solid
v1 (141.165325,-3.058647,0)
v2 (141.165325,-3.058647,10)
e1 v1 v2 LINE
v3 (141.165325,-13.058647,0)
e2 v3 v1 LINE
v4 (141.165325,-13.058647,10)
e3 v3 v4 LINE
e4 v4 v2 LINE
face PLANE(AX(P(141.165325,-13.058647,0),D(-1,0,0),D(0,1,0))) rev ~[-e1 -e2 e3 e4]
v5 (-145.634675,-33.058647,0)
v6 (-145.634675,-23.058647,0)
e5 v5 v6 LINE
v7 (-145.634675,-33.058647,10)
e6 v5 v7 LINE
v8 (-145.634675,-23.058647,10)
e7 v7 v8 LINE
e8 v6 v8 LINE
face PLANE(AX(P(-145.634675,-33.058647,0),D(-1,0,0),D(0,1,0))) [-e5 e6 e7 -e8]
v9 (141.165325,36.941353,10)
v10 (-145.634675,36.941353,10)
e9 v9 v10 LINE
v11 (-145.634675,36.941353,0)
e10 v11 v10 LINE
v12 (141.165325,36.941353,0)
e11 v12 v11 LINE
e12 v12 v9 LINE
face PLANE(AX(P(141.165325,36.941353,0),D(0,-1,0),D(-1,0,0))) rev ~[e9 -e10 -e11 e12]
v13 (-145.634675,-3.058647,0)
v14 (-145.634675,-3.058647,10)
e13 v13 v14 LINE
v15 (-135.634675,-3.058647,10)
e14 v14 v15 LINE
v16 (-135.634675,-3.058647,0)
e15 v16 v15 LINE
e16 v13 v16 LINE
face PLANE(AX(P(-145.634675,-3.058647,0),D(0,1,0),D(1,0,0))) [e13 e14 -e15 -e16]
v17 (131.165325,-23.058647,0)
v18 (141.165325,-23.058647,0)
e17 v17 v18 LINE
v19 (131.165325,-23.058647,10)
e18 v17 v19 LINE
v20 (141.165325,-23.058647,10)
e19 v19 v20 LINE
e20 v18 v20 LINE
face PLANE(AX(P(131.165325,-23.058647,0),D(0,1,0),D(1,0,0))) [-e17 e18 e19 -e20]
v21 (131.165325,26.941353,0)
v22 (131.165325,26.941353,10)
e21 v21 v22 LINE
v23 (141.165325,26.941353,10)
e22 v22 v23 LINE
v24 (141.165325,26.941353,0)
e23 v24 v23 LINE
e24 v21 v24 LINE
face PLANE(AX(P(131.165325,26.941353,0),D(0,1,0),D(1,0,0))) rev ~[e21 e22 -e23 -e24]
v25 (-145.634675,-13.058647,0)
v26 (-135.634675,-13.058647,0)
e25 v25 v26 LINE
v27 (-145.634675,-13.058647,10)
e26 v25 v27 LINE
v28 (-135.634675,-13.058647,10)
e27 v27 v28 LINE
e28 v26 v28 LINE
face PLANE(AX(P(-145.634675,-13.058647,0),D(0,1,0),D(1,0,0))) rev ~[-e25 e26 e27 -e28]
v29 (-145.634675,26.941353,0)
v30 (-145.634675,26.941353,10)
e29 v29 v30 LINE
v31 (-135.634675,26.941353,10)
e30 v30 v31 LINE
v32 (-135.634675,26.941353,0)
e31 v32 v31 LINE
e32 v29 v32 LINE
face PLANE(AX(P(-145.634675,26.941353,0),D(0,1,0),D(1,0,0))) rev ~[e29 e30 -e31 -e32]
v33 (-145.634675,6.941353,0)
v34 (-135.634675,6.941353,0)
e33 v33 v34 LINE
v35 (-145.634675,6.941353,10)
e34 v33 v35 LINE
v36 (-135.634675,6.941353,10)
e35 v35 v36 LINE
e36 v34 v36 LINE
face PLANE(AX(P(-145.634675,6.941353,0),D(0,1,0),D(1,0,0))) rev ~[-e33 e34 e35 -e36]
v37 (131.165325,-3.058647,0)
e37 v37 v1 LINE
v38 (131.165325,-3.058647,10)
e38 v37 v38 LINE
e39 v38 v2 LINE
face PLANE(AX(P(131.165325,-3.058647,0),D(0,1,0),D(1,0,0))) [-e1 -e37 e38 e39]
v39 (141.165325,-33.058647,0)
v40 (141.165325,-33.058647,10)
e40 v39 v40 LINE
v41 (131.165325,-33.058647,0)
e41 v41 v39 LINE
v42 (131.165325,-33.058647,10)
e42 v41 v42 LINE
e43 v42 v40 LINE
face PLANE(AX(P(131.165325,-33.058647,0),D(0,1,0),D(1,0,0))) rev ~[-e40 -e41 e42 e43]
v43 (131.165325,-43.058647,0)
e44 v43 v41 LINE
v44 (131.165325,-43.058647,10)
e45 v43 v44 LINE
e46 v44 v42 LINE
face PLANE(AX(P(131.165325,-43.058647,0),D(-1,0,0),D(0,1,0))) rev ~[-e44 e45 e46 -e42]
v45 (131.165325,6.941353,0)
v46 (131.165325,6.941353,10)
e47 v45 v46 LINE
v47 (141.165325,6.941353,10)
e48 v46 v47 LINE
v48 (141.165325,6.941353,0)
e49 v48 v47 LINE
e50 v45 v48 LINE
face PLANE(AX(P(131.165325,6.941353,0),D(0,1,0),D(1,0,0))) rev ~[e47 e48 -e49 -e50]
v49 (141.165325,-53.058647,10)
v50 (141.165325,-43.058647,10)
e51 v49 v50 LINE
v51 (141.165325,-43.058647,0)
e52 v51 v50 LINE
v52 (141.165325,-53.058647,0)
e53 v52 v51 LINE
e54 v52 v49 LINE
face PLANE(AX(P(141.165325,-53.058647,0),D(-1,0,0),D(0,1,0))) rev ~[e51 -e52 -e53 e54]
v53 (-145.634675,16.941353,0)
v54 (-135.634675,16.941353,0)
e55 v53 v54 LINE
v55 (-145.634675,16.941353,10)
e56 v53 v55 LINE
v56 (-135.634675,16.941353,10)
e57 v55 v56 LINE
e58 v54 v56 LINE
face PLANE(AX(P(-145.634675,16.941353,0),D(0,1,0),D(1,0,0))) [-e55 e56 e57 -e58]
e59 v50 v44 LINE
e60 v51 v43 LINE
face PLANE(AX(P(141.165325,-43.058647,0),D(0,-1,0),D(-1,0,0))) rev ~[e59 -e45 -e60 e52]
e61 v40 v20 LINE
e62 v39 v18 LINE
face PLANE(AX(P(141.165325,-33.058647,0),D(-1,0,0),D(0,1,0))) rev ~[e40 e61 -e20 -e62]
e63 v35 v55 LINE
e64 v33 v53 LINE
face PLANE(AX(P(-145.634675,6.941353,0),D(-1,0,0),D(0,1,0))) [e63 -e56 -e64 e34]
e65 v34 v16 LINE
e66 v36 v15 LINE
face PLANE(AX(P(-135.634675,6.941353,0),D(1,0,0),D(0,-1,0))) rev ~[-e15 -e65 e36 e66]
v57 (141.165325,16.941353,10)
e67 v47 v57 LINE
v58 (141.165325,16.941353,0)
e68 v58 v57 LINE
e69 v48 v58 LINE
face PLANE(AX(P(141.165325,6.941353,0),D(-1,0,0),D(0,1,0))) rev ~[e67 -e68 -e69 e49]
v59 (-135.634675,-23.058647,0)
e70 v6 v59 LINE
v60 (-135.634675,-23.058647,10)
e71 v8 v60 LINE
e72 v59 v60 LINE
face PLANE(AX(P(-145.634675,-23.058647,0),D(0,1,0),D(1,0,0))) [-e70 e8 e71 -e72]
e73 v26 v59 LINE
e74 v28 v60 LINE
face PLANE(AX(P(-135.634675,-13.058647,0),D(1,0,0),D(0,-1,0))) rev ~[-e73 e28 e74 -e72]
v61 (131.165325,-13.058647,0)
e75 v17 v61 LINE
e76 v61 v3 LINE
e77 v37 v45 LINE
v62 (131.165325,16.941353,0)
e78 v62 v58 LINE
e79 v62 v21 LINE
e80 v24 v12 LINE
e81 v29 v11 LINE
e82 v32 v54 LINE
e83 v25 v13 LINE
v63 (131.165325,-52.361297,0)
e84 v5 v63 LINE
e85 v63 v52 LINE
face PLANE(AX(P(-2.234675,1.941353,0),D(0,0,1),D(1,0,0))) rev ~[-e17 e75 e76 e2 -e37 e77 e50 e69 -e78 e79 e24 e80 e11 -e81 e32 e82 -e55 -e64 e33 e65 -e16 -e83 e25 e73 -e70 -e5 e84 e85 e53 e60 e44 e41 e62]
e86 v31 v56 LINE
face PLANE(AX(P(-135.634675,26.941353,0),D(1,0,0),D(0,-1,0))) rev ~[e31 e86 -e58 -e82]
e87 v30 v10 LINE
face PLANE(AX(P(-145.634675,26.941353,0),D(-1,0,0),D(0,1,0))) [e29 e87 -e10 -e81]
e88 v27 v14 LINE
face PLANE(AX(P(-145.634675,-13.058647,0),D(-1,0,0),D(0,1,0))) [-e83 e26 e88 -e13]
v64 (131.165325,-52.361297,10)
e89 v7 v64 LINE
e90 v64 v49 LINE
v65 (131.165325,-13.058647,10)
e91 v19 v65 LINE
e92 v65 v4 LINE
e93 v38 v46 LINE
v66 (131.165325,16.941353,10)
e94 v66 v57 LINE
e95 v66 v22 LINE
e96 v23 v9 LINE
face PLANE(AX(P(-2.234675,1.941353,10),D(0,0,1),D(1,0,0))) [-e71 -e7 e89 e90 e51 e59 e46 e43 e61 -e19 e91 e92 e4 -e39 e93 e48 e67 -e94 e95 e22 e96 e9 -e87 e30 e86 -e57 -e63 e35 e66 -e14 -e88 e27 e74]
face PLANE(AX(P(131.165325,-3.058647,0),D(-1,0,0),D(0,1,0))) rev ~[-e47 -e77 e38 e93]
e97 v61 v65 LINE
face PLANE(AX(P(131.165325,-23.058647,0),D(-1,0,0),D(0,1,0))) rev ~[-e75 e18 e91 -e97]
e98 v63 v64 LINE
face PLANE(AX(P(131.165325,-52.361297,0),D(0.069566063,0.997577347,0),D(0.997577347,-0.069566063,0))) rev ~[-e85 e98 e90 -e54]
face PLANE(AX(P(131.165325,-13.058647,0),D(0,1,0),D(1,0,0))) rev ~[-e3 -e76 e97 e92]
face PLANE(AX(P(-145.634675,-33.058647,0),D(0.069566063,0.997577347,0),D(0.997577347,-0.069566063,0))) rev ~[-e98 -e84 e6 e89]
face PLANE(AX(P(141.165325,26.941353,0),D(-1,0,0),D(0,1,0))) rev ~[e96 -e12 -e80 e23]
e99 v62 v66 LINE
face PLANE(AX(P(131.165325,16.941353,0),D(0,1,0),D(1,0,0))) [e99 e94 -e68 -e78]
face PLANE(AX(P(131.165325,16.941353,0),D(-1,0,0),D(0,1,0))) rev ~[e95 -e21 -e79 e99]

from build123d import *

# Parameters (mm, degrees)
F0_W     = 10
F0_H     = 10
F1_DEPTH = 10


# Not quite as in the source:
# - a feature names something its author has since deleted; it is built from what else it names


with BuildPart() as f1:
    # F0 (on Top) → F1 (new body)
    with BuildSketch(Plane.XY):
        Polygon((131.1653250098, 36.9413525529), (-135.6346749902, 36.9413525529), (-135.6346749902, 26.9413525529), (-135.6346749902, 16.9413525529), (-135.6346749902, 6.9413525529), (-135.6346749902, -3.0586474471), (-135.6346749902, -13.0586474471), (-135.6346749902, -23.0586474471), (-135.6346749902, -33.0586474471), (131.1653250098, -33.0586474471), (131.1653250098, -23.0586474471), (131.1653250098, -13.0586474471), (131.1653250098, -3.0586474471), (131.1653250098, 6.9413525529), (131.1653250098, 16.9413525529), (131.1653250098, 26.9413525529), align=None)
        with Locations((-140.6346749902, 31.9413525529)):
            Rectangle(F0_W, F0_H)
        with Locations((-140.6346749902, 11.9413525529)):
            Rectangle(F0_W, F0_H)
        with Locations((-140.6346749902, -8.0586474471)):
            Rectangle(F0_W, F0_H)
        with Locations((-140.6346749902, -28.0586474471)):
            Rectangle(F0_W, F0_H)
        with Locations((136.1653250098, 31.9413525529)):
            Rectangle(F0_W, F0_H)
        with Locations((136.1653250098, 11.9413525529)):
            Rectangle(F0_W, F0_H)
        with Locations((136.1653250098, -8.0586474471)):
            Rectangle(F0_W, F0_H)
        with Locations((136.1653250098, -28.0586474471)):
            Rectangle(F0_W, F0_H)
        Polygon((-135.6346749902, -33.0586474471), (-145.6346749902, -33.0586474471), (131.1653250098, -52.3612973773), (131.1653250098, -43.0586474471), (131.1653250098, -33.0586474471), align=None)
        Polygon((131.1653250098, -43.0586474471), (131.1653250098, -52.3612973773), (141.1653250098, -53.0586474471), (141.1653250098, -43.0586474471), align=None)
    extrude(amount=F1_DEPTH)


solid = f1.part
